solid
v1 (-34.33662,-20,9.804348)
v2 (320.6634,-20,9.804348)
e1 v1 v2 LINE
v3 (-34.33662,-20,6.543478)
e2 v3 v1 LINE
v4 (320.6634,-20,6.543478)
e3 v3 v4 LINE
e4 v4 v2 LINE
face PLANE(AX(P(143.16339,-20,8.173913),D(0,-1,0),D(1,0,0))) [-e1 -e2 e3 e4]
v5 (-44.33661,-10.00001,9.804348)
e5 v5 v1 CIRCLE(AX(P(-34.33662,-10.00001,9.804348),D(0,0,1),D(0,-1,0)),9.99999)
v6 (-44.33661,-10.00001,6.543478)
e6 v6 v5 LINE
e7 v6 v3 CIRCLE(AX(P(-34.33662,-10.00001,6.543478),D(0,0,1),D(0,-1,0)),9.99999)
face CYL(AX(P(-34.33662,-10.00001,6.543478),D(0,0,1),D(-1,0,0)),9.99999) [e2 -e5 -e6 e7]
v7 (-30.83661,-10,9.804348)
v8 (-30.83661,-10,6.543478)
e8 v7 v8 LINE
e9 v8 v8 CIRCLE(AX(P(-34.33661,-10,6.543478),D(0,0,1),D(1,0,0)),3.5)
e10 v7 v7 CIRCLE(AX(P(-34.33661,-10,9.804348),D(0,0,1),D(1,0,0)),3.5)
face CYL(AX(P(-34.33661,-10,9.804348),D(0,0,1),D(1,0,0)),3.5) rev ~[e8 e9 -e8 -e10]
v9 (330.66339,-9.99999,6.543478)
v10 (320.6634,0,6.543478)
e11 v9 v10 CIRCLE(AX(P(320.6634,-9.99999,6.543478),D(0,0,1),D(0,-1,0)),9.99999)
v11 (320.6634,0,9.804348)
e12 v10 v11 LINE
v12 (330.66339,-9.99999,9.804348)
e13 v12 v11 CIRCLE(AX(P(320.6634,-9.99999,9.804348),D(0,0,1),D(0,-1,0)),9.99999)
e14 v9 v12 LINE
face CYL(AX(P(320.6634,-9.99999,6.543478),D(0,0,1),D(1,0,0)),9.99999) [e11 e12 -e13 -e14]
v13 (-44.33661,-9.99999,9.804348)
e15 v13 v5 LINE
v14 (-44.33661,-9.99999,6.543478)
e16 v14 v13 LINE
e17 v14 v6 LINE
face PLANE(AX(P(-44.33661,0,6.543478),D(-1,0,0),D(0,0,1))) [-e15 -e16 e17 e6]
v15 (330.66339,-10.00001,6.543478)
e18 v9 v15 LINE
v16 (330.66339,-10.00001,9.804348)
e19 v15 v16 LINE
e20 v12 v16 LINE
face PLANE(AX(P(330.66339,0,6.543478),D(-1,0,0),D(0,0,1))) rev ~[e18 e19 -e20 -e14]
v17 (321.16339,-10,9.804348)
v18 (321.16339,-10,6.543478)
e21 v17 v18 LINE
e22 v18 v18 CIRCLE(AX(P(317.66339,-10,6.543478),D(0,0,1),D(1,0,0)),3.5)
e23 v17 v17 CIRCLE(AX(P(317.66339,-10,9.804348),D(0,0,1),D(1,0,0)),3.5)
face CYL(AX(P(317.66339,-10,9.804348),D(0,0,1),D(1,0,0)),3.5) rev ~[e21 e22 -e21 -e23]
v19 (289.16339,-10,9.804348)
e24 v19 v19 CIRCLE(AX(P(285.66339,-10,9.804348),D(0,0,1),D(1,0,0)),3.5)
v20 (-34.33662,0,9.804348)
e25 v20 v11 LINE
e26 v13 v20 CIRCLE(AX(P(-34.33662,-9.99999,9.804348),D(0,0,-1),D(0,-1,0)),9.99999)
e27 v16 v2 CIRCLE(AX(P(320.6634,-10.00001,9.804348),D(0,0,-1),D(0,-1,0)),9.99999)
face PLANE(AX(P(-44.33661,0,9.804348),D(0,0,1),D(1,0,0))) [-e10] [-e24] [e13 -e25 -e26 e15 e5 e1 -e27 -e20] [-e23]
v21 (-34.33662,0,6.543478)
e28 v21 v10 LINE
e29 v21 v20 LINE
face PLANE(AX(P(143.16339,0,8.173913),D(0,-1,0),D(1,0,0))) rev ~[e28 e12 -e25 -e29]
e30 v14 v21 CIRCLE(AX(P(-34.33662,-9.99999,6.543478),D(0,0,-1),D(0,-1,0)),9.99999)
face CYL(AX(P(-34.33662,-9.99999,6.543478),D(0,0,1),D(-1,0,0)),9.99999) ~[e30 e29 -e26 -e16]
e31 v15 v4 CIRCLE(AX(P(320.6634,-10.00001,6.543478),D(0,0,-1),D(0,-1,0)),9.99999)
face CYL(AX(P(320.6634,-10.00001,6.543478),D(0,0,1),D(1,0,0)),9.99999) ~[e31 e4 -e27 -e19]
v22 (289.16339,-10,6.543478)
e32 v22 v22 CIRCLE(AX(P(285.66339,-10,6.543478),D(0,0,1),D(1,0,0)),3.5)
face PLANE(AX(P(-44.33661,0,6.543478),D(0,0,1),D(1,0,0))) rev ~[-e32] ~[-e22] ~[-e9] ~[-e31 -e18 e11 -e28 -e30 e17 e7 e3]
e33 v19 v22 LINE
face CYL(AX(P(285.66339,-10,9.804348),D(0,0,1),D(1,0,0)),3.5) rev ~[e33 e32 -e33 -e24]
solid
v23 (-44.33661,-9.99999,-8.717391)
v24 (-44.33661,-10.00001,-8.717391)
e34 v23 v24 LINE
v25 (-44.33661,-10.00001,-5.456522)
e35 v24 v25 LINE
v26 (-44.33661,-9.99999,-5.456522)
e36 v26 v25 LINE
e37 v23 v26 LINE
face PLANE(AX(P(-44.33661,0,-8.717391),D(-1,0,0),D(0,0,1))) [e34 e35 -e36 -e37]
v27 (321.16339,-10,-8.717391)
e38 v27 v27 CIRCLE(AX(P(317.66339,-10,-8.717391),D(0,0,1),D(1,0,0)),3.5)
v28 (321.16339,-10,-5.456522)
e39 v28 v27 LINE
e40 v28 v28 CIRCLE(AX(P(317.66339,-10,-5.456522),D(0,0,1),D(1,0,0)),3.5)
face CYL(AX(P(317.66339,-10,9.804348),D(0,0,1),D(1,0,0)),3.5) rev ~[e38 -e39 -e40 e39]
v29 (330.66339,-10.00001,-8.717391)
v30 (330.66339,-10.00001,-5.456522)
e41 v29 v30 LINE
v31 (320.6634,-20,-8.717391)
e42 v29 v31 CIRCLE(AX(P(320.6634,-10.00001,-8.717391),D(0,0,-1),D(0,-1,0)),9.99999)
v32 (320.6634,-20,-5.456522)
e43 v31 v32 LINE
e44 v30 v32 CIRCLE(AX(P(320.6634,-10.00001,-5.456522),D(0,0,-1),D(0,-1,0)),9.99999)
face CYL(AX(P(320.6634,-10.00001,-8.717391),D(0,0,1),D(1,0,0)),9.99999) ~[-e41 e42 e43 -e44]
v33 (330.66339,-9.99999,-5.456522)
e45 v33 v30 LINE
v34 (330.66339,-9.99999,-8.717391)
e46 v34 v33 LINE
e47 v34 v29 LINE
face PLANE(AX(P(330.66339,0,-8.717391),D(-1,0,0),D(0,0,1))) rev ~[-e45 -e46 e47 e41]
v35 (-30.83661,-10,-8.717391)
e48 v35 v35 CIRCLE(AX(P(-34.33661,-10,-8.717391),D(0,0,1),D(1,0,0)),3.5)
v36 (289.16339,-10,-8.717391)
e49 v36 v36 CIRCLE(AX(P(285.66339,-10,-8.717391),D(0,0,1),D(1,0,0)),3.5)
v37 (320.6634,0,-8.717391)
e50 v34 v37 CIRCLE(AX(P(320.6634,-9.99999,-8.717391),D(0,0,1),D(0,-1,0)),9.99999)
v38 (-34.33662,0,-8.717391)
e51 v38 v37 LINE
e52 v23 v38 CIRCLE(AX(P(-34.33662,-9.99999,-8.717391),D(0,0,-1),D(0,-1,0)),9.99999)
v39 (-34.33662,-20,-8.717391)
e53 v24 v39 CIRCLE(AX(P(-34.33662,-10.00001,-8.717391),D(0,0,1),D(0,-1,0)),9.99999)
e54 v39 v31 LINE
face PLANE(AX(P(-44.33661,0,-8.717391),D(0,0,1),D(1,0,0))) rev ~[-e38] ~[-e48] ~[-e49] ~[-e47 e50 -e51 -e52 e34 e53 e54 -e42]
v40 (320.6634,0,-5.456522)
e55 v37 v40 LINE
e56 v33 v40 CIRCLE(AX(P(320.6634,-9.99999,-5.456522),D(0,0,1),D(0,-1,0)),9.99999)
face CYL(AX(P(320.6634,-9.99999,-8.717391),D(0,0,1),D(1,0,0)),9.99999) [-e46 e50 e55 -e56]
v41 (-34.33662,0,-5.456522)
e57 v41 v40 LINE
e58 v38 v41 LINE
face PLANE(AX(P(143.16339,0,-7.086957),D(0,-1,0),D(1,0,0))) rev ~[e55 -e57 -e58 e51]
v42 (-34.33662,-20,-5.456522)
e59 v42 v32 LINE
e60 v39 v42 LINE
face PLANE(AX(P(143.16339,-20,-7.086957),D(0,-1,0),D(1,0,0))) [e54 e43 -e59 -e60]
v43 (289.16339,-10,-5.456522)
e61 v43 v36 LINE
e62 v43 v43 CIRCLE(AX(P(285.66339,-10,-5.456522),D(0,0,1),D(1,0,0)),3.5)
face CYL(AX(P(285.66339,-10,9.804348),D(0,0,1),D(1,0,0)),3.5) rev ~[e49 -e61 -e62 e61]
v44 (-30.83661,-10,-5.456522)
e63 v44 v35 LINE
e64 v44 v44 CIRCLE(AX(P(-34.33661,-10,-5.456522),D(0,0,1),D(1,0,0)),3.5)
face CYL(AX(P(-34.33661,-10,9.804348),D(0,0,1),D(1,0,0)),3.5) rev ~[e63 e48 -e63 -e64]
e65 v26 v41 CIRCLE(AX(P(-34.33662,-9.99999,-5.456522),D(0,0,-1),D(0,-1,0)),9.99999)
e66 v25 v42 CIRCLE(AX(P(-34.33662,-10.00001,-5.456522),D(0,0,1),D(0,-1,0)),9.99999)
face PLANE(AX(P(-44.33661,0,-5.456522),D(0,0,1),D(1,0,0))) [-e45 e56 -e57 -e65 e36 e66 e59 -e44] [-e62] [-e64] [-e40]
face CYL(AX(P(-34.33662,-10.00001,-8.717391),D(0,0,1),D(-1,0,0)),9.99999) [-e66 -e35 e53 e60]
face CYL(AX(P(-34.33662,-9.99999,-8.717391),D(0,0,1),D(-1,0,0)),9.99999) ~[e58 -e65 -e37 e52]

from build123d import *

# Parameters (mm, degrees)
F0_W     = 375
F0_H     = 3.2608695652
F1_DEPTH = 20
F2_R     = 9.99999
F2_2_R   = 9.99999
F3_R     = 3.5
F4_DEPTH = 25


# Not quite as in the source:
# - a fillet or chamfer is up to 0.001 mm smaller than in the source, because OpenCascade refuses the exact size
# - a feature names something its author has since deleted; it is built from what else it names


with BuildPart() as f1:
    # F0 (on Front) → F1 (new body)
    with BuildSketch(Plane.XZ):
        with Locations((143.1633904347, -7.0869565217)):
            Rectangle(F0_W, F0_H)
    extrude(amount=F1_DEPTH)

    # F2#2 (radius 10 in the source; OpenCascade refuses exactly that, so slightly less here)
    f2_2_edges = [f1.edges().sort_by_distance(p)[0] for p in [
        (330.66339, -20, -7.086957),
        (330.66339, 0, -7.086957),
        (-44.33661, 0, -7.086957),
        (-44.33661, -20, -7.086957),
    ]]
    fillet(f2_2_edges, radius=F2_2_R)


with BuildPart() as f1b:
    # F0 (on Front) → F1, piece 2 (new body)
    with BuildSketch(Plane.XZ):
        with Locations((143.1633904347, 8.1739130435)):
            Rectangle(F0_W, F0_H)
    extrude(amount=F1_DEPTH)

    # F2 (radius 10 in the source; OpenCascade refuses exactly that, so slightly less here)
    f2_edges = [f1b.edges().sort_by_distance(p)[0] for p in [
        (330.66339, -20, 8.173913),
        (330.66339, 0, 8.173913),
        (-44.33661, 0, 8.173913),
        (-44.33661, -20, 8.173913),
    ]]
    fillet(f2_edges, radius=F2_R)


with BuildPart() as f4_tool:
    # F3 (on face) → F4 (new body)
    with BuildSketch(Plane.XY.offset(9.8043478261)):
        with Locations((317.6633904347, -10)):
            Circle(F3_R)
        with Locations((285.6633904347, -10)):
            Circle(F3_R)
        with Locations((-34.3366095653, -10)):
            Circle(F3_R)
    extrude(amount=-F4_DEPTH)


with BuildPart() as f1_1:
    add(f1.part)

    # F4: cut by f4_tool
    add(f4_tool.part, mode=Mode.SUBTRACT)


with BuildPart() as f1b_1:
    add(f1b.part)

    # F4: cut by f4_tool
    add(f4_tool.part, mode=Mode.SUBTRACT)


solid = Compound([f1_1.part, f1b_1.part])
